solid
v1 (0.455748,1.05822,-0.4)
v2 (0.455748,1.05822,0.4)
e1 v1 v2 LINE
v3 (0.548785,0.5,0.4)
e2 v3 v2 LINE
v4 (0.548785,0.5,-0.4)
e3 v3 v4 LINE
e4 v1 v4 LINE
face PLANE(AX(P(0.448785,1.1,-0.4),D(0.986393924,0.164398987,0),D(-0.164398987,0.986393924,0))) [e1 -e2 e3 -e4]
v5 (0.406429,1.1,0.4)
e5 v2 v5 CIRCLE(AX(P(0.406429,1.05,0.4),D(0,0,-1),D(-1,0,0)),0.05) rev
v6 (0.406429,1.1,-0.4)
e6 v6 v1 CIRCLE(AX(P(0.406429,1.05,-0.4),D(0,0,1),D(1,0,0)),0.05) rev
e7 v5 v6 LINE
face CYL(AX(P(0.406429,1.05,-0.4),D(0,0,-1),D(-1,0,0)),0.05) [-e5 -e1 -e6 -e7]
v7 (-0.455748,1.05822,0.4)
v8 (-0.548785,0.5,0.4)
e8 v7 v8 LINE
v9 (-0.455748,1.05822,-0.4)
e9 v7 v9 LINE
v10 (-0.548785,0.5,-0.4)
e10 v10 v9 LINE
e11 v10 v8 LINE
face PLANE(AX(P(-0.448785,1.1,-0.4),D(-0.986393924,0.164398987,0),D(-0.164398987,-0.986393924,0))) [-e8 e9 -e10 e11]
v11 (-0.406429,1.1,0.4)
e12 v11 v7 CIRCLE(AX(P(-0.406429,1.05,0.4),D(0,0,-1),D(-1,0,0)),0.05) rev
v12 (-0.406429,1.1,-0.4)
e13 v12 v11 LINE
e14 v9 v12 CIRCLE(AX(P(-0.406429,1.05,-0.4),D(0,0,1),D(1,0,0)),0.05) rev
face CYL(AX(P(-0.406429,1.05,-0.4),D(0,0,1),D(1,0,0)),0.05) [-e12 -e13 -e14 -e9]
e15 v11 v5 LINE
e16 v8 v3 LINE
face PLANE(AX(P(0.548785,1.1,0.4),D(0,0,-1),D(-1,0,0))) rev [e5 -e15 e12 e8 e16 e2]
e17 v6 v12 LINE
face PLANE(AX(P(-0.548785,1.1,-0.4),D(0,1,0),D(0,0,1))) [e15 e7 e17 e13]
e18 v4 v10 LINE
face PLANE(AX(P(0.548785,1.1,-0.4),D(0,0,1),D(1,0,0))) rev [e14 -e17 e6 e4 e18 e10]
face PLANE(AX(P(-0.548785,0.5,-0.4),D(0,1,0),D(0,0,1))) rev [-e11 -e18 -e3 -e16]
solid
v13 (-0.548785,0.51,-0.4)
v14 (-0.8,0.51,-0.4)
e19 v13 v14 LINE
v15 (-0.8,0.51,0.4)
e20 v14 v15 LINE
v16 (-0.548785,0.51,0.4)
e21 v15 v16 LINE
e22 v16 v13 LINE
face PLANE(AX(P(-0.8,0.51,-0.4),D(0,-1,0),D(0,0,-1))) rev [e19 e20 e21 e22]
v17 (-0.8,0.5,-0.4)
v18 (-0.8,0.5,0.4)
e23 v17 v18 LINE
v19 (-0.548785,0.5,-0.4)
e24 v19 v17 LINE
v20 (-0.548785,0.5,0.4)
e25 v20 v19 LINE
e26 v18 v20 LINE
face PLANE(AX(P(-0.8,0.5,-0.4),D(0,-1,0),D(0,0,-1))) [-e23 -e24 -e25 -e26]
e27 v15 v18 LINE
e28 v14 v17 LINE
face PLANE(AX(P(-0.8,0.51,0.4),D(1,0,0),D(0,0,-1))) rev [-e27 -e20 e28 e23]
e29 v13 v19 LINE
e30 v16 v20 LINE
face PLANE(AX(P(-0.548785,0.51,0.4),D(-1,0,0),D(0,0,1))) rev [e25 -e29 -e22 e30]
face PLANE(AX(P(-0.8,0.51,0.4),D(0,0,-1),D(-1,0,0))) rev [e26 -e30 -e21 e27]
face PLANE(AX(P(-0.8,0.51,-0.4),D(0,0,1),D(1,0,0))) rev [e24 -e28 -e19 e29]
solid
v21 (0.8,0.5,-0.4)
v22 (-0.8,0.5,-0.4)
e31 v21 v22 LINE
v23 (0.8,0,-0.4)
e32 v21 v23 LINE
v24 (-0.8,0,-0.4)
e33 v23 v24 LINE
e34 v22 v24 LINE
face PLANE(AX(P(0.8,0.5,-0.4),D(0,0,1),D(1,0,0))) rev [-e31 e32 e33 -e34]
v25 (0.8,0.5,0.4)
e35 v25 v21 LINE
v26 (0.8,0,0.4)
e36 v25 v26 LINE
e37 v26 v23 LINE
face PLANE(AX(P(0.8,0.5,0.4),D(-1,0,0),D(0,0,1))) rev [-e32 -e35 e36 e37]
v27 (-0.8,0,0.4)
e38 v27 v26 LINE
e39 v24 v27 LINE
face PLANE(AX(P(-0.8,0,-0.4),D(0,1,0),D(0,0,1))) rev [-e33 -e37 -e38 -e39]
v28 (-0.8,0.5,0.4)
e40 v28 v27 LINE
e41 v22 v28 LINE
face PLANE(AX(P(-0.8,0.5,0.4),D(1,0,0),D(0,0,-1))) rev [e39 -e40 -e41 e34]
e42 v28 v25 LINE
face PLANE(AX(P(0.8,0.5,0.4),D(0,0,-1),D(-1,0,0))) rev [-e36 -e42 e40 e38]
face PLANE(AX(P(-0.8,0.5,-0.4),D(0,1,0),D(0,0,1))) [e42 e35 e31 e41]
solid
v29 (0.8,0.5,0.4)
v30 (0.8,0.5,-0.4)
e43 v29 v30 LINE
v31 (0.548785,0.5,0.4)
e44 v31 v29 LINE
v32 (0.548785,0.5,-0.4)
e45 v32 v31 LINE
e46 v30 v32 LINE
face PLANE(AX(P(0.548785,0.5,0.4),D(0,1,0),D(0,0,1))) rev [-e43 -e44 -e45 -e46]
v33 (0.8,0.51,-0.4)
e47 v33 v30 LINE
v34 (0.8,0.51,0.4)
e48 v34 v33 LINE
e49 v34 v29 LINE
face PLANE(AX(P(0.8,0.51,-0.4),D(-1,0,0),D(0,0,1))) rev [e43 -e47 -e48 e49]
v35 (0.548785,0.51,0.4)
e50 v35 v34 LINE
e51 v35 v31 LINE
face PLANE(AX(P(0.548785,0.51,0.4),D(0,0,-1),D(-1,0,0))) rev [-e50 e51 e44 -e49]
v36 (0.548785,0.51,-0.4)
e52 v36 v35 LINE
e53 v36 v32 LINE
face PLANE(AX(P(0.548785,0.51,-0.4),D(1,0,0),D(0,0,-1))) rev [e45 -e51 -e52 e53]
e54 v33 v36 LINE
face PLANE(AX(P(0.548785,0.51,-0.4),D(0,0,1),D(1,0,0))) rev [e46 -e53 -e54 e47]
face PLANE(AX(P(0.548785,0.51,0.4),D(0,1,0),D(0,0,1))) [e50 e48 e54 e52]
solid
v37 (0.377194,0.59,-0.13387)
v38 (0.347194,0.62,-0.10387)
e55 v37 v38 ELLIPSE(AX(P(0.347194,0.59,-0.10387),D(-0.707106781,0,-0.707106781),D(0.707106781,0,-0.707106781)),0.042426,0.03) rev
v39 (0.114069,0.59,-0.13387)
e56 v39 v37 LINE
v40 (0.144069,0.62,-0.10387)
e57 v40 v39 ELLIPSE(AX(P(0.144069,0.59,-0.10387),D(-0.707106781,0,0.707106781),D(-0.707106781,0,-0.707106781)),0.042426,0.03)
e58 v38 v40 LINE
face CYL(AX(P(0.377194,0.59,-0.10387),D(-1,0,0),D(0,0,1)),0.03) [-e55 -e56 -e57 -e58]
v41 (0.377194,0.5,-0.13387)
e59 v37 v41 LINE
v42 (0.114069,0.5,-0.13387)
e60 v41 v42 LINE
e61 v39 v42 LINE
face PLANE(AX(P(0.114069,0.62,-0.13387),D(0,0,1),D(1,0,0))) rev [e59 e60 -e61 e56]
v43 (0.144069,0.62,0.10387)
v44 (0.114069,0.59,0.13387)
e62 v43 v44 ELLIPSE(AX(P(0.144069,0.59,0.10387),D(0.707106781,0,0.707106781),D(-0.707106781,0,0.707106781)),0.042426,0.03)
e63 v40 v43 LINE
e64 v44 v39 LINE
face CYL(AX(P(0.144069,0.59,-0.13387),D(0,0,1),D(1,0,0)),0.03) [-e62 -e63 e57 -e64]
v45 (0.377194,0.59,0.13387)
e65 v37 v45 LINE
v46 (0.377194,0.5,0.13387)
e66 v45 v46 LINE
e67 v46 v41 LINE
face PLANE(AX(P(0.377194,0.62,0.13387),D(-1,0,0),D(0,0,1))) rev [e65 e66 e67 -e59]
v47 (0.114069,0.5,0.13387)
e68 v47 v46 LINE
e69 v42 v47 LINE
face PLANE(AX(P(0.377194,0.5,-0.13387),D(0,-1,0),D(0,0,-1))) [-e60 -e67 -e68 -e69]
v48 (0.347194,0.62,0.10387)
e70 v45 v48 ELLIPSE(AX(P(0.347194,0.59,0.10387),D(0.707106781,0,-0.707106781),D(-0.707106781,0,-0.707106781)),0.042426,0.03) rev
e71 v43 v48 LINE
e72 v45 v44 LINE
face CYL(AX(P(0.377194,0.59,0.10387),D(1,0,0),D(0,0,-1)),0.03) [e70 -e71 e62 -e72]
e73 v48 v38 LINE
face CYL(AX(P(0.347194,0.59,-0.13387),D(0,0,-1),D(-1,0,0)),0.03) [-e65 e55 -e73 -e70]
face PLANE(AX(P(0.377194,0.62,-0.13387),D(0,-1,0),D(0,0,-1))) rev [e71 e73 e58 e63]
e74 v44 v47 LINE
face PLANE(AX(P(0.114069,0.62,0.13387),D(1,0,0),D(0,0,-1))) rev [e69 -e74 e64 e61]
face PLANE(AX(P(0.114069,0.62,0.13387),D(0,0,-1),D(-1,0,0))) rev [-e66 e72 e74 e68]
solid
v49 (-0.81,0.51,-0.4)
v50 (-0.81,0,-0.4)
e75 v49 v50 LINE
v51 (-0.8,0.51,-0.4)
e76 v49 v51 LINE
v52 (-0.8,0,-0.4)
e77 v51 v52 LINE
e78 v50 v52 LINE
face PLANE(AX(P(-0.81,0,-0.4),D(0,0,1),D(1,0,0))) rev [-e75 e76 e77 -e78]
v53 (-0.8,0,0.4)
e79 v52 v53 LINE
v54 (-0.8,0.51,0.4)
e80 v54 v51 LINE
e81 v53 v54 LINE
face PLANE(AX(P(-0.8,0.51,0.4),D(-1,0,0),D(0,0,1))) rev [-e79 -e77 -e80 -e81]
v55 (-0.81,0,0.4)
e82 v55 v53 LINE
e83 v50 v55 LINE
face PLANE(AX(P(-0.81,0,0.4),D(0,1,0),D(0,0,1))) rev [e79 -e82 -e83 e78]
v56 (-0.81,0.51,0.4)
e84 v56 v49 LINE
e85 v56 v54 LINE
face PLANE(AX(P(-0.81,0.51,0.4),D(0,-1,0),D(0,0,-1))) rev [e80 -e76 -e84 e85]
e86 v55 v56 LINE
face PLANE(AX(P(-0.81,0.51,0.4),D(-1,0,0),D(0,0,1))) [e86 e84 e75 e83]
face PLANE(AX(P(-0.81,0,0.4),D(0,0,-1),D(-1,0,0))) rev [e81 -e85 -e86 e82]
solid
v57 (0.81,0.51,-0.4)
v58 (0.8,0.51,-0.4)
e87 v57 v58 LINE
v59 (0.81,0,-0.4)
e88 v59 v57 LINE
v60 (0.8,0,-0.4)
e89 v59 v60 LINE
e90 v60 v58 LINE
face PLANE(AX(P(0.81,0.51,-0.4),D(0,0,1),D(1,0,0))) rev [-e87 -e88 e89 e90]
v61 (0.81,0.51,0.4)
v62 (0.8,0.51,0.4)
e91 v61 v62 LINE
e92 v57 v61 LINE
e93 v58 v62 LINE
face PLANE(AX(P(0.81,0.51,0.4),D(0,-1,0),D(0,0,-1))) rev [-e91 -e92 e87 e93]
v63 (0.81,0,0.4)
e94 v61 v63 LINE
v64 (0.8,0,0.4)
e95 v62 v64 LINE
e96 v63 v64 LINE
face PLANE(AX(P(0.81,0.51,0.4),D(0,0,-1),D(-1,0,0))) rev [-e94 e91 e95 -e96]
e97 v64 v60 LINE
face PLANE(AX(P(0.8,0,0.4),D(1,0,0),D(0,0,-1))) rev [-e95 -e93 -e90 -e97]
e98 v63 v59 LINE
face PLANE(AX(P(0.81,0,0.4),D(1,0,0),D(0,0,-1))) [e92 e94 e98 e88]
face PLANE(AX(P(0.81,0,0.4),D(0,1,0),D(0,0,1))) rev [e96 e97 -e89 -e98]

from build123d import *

# Parameters (mm, degrees)
SZKIC2_W                      = 1.6
SZKIC2_H                      = 0.8
DODANIE_WYCI_GNI_CIE1_DEPTH   = 0.5
SZKIC6_W                      = 1.097570152
SZKIC6_H                      = 0.8
DODANIE_WYCI_GNI_CIE4_DEPTH   = 0.6
SZKIC7_W                      = 0.263125241
SZKIC7_H                      = 0.267740406
DODANIE_WYCI_GNI_CIE5_DEPTH   = 0.12
SFAZOWANIE3_SIZE              = 0.6
SFAZOWANIE3_SIZE_2            = 0.1
SFAZOWANIE4_SIZE              = 0.1
SFAZOWANIE4_SIZE_2            = 0.6
ZAOKR_GLENIE3_R               = 0.05
ZAOKR_GLENIE4_R               = 0.05
SZKIC8_W                      = 0.251214924
SZKIC8_H                      = 0.8
DODANIE_WYCI_GNI_CIE6_DEPTH   = 0.01
DODANIE_WYCI_GNI_CIE6_2_DEPTH = 0.01
SZKIC9_W                      = 0.8
SZKIC9_H                      = 0.51
DODANIE_WYCI_GNI_CIE7_DEPTH   = 0.01
SZKIC10_W                     = 0.8
SZKIC10_H                     = 0.51
DODANIE_WYCI_GNI_CIE8_DEPTH   = 0.01
ZAOKR_GLENIE5_R               = 0.03


with BuildPart() as part:
    # Szkic2 → Dodanie-wyciągnięcie1 (new body)
    with BuildSketch(Plane(origin=(0, 0, 0), x_dir=(1, 0, 0), z_dir=(0, 1, 0))):
        Rectangle(SZKIC2_W, SZKIC2_H)
    extrude(amount=DODANIE_WYCI_GNI_CIE1_DEPTH)


with BuildPart() as body_2:
    # Szkic6 → Dodanie-wyciągnięcie4 (new body)
    with BuildSketch(Plane(origin=(0, 0.5, 0), x_dir=(1, 0, 0), z_dir=(0, 1, 0))):
        Rectangle(SZKIC6_W, SZKIC6_H)
    extrude(amount=DODANIE_WYCI_GNI_CIE4_DEPTH)

    # Sfazowanie3
    # the kernel refuses this chamfer: 0.6, 0.1 mm, written as the material it takes off along each edge
    with BuildSketch(Plane(origin=(-0.548785076, 1.1, 1.959214836), x_dir=(-0.0063262220237778315, -0.9999799892572381, 0), z_dir=(0, 0, -1))) as sfazowanie3_piece_1:
        Polygon((SFAZOWANIE3_SIZE * 0.999979989257, -SFAZOWANIE3_SIZE * 0.00632622202378), (-SFAZOWANIE3_SIZE_2 * 0.00632622202378, -SFAZOWANIE3_SIZE_2 * 0.999979989257), (0, 0), align=None)
    extrude(amount=3.918429673, mode=Mode.SUBTRACT)

    # Sfazowanie4
    # the kernel refuses this chamfer: 0.6, 0.1 mm, written as the material it takes off along each edge
    with BuildSketch(Plane(origin=(0.548785076, 1.1, -1.959214836), x_dir=(-0.9750324932942596, 0.2220622368174737, 0), z_dir=(0, 0, 1))) as sfazowanie4_piece_1:
        Polygon((SFAZOWANIE4_SIZE * 0.975032493294, SFAZOWANIE4_SIZE * 0.222062236817), (-SFAZOWANIE4_SIZE_2 * 0.222062236817, SFAZOWANIE4_SIZE_2 * 0.975032493294), (0, 0), align=None)
    extrude(amount=3.918429673, mode=Mode.SUBTRACT)

    # Zaokrąglenie3
    zaokr_glenie3_edges = [body_2.edges().sort_by_distance(p)[0] for p in [
        (0.448785076, 1.1, 0),
    ]]
    fillet(zaokr_glenie3_edges, radius=ZAOKR_GLENIE3_R)

    # Zaokrąglenie4
    zaokr_glenie4_edges = [body_2.edges().sort_by_distance(p)[0] for p in [
        (-0.448785076, 1.1, 0),
    ]]
    fillet(zaokr_glenie4_edges, radius=ZAOKR_GLENIE4_R)


with BuildPart() as body_3:
    # Szkic7 → Dodanie-wyciągnięcie5 (new body)
    with BuildSketch(Plane(origin=(0, 0.5, 0), x_dir=(1, 0, 0), z_dir=(0, 1, 0))):
        with Locations((0.245631468, 0)):
            Rectangle(SZKIC7_W, SZKIC7_H)
    extrude(amount=DODANIE_WYCI_GNI_CIE5_DEPTH)

    # Zaokrąglenie5
    zaokr_glenie5_edges = [body_3.edges().sort_by_distance(p)[0] for p in [
        (0.114068847, 0.62, 0),
        (0.245631467, 0.62, 0.133870203),
        (0.377194088, 0.62, 0),
        (0.245631467, 0.62, -0.133870203),
    ]]
    fillet(zaokr_glenie5_edges, radius=ZAOKR_GLENIE5_R)


with BuildPart() as body_4:
    # Szkic8 → Dodanie-wyciągnięcie6 (new body)
    with BuildSketch(Plane(origin=(0, 0.5, 0), x_dir=(1, 0, 0), z_dir=(0, 1, 0))):
        with Locations((-0.674392538, 0)):
            Rectangle(SZKIC8_W, SZKIC8_H)
    extrude(amount=DODANIE_WYCI_GNI_CIE6_DEPTH)


with BuildPart() as body_5:
    # Szkic8 → Dodanie-wyci_gni_cie6 2 (new body)
    with BuildSketch(Plane(origin=(0, 0.5, 0), x_dir=(1, 0, 0), z_dir=(0, 1, 0))):
        with Locations((0.674392538, 0)):
            Rectangle(SZKIC8_W, SZKIC8_H)
    extrude(amount=DODANIE_WYCI_GNI_CIE6_2_DEPTH)


with BuildPart() as body_6:
    # Szkic9 → Dodanie-wyciągnięcie7 (new body)
    with BuildSketch(Plane.ZY.offset(0.8)):
        with Locations((0, 0.255)):
            Rectangle(SZKIC9_W, SZKIC9_H)
    extrude(amount=DODANIE_WYCI_GNI_CIE7_DEPTH)


with BuildPart() as body_7:
    # Szkic10 → Dodanie-wyciągnięcie8 (new body)
    with BuildSketch(Plane(origin=(0.8, 0, 0), x_dir=(0, 0, -1), z_dir=(1, 0, 0))):
        with Locations((0, 0.255)):
            Rectangle(SZKIC10_W, SZKIC10_H)
    extrude(amount=DODANIE_WYCI_GNI_CIE8_DEPTH)


solid = Compound([part.part, body_2.part, body_3.part, body_4.part, body_5.part, body_6.part, body_7.part])
